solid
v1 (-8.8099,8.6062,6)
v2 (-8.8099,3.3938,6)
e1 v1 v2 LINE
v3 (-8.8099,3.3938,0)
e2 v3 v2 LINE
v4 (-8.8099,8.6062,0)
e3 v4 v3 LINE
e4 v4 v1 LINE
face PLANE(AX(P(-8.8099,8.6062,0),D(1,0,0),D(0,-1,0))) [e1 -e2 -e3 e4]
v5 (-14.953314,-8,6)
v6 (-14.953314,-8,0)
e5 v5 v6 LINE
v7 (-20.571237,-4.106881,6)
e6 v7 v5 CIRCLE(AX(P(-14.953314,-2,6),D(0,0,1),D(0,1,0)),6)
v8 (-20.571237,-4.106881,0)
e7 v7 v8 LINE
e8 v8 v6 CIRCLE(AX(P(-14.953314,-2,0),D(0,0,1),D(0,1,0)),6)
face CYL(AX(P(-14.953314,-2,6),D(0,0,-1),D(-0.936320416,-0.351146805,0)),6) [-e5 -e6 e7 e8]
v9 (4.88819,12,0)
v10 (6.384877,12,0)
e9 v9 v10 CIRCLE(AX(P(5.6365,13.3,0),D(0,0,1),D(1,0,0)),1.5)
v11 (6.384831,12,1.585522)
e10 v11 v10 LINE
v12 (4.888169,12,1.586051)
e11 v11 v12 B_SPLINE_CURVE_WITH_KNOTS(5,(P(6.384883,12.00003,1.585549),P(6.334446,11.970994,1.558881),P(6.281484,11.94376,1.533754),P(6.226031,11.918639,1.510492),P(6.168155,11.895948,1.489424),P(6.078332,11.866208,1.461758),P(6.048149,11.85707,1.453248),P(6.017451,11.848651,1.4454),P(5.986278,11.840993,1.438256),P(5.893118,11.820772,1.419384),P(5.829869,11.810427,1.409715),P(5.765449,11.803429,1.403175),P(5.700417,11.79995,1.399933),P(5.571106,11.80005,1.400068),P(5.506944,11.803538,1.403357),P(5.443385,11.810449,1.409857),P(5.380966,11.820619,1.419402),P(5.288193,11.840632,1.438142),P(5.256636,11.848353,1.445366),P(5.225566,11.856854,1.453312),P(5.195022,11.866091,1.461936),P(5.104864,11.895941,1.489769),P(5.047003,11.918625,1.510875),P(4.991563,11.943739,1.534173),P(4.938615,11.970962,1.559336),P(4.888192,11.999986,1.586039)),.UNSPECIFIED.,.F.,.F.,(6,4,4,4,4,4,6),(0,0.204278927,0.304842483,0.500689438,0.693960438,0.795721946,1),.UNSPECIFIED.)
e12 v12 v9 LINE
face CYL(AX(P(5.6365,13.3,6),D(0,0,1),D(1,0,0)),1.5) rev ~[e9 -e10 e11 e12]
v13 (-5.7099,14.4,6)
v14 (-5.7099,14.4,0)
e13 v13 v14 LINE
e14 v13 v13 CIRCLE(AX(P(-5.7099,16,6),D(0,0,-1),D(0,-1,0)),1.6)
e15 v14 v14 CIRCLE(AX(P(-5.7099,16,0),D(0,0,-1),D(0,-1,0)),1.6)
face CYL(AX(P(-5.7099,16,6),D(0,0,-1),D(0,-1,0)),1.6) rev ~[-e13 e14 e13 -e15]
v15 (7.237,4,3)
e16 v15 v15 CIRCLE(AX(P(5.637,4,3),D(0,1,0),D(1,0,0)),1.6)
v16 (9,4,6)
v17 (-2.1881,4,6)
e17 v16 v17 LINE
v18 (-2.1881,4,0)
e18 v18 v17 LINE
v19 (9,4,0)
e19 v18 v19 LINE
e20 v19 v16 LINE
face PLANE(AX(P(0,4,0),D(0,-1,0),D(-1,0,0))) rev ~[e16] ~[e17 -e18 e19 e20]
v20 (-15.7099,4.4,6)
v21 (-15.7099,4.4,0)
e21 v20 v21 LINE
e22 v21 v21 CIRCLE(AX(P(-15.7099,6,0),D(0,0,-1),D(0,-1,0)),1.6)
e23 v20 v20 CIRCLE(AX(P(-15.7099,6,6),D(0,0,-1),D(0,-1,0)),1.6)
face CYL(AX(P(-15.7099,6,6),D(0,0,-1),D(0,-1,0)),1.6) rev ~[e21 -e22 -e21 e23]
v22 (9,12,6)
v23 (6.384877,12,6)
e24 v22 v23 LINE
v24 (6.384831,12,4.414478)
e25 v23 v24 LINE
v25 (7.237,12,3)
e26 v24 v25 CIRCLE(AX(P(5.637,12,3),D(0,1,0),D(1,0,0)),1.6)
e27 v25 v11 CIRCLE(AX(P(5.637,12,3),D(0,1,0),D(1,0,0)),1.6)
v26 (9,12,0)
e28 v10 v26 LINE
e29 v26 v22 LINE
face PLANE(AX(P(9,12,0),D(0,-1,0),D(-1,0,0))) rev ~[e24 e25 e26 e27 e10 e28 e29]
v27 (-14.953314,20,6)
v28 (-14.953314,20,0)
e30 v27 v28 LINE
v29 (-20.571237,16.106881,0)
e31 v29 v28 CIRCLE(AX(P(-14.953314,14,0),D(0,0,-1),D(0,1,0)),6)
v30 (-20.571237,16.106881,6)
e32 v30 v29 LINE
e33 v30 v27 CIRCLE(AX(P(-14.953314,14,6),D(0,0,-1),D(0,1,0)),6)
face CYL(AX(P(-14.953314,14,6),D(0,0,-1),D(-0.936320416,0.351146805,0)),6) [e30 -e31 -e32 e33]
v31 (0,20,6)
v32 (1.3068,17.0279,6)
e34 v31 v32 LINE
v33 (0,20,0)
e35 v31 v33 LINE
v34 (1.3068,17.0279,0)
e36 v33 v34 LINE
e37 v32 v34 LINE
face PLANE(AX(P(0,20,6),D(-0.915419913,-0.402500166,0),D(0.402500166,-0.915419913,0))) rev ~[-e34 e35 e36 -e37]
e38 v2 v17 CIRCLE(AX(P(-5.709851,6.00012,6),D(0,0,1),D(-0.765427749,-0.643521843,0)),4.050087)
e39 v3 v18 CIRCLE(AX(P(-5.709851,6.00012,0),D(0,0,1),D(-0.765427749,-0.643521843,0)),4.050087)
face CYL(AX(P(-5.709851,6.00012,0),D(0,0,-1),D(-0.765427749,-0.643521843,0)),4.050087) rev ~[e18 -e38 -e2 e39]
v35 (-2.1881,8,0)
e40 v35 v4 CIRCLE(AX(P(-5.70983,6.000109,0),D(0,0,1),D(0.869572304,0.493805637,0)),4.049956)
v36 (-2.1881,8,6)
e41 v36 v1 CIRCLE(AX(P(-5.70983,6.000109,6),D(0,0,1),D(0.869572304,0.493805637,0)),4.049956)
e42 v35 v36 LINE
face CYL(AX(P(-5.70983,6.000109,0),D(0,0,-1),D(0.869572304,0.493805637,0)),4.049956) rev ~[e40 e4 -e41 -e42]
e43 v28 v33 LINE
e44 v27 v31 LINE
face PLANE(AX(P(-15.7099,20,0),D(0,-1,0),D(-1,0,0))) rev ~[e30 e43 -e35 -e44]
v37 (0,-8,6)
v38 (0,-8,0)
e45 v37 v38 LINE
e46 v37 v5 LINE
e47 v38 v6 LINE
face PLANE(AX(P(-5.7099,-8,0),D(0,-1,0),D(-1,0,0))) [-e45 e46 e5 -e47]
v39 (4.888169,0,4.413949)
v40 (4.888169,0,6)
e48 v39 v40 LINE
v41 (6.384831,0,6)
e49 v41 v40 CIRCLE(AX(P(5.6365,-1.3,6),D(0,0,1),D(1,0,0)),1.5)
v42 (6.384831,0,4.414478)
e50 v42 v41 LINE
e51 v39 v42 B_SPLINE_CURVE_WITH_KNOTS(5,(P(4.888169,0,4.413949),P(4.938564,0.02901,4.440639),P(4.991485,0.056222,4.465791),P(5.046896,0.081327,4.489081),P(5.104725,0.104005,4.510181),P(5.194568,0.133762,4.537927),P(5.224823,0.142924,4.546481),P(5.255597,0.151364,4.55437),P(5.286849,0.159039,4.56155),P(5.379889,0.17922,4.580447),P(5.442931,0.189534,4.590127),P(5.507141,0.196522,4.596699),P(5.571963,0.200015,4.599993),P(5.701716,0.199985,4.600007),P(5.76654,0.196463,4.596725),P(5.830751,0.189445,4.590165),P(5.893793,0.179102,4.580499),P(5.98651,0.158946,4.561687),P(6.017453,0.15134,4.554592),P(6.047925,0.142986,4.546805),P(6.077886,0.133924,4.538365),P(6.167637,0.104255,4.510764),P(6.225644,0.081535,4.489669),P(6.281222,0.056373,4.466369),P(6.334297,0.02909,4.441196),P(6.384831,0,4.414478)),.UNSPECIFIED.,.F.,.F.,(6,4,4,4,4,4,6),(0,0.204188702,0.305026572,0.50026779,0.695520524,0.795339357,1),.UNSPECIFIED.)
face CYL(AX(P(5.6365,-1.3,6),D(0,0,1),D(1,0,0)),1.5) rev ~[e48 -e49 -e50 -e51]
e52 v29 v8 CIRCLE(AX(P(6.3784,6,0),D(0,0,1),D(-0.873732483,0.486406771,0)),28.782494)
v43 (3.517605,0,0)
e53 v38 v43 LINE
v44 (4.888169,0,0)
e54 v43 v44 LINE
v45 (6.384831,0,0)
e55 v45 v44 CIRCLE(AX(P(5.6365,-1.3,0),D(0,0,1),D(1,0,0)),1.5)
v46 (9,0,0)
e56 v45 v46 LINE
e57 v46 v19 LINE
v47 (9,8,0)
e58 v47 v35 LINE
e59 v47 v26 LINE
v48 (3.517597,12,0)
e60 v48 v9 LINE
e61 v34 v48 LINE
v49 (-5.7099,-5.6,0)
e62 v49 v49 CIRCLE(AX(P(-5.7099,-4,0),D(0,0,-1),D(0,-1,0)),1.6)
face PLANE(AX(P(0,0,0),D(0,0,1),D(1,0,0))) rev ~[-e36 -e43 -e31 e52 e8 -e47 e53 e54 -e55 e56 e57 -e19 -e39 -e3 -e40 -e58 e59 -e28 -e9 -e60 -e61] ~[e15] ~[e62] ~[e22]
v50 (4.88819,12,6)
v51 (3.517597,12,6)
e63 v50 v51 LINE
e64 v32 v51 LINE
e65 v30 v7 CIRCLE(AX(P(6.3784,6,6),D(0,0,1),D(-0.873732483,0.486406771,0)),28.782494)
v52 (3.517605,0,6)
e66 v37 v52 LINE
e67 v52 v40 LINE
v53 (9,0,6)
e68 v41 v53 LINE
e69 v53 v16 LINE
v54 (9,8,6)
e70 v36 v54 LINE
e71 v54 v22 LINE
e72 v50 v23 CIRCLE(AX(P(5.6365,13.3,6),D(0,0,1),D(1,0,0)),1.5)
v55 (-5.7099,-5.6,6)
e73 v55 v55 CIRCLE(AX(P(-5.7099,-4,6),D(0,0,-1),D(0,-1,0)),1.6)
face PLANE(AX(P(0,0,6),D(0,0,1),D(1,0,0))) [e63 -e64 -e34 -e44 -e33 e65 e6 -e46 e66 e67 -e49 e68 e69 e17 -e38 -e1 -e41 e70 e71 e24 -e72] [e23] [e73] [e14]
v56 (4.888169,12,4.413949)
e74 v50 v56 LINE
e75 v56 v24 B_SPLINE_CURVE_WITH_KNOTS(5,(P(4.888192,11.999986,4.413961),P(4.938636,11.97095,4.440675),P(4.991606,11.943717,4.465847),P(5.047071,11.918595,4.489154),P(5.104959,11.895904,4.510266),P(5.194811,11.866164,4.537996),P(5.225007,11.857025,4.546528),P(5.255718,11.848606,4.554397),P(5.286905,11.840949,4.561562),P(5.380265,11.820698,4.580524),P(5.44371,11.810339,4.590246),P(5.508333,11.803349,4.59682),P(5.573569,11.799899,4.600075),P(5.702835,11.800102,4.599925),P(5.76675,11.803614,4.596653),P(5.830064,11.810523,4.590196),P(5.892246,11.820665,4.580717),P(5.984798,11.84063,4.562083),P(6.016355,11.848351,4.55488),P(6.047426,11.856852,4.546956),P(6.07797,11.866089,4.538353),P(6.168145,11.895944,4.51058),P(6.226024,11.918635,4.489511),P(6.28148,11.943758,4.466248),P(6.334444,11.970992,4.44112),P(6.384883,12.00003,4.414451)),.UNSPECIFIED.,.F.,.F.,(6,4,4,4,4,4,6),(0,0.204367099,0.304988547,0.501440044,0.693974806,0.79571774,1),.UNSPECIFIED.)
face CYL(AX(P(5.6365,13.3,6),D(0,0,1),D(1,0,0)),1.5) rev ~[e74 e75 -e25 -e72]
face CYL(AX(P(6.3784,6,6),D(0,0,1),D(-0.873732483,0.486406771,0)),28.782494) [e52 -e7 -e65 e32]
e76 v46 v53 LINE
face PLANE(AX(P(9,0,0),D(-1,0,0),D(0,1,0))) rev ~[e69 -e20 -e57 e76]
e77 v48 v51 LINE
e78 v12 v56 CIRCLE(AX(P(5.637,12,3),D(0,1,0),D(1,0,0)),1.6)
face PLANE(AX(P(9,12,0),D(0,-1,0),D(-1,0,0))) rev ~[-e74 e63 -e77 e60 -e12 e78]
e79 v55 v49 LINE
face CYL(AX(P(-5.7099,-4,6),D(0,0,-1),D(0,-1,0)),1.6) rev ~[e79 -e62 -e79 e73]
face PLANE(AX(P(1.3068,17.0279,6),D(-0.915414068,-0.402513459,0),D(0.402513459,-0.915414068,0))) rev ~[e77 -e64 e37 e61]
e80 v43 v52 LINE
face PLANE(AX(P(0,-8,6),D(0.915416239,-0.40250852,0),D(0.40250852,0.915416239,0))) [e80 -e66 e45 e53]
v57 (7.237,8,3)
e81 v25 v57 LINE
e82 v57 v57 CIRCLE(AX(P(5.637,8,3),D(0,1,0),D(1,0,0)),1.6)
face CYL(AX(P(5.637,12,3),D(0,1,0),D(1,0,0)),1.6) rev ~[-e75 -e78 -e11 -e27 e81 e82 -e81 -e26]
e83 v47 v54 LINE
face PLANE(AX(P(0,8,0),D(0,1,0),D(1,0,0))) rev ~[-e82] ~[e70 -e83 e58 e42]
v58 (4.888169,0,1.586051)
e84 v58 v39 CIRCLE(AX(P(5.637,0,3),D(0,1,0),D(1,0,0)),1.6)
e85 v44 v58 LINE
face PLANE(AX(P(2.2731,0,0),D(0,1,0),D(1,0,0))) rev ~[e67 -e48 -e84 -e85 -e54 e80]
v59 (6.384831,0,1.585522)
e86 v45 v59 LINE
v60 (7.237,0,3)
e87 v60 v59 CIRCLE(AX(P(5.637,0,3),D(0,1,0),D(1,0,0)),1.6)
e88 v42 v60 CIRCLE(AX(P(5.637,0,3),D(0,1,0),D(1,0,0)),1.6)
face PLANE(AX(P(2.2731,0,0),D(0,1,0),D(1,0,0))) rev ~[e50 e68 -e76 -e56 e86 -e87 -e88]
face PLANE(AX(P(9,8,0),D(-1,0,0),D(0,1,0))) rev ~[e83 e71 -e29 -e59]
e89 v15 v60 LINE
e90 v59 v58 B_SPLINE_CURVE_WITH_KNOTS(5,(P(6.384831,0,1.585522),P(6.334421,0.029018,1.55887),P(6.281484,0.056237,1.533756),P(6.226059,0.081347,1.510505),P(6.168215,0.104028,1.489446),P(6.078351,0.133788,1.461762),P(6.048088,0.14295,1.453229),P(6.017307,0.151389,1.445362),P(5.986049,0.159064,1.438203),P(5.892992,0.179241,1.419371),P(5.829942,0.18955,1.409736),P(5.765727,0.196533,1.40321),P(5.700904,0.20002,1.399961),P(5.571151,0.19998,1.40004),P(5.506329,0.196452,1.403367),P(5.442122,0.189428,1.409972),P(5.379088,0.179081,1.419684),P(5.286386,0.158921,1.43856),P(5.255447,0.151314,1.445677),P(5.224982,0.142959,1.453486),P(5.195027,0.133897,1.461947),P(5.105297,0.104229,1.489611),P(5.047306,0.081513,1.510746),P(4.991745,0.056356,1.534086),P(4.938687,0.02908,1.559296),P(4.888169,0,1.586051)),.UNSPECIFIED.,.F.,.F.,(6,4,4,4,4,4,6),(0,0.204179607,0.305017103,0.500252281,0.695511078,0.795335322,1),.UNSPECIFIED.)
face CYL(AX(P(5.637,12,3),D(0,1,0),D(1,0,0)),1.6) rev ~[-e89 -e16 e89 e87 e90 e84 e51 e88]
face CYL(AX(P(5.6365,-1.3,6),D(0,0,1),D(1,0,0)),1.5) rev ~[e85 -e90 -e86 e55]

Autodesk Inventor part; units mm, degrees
ref_plane "YZ Plane" through (0, 0, 0) normal (1, 0, 0) x (0, 1, 0)
ref_plane "XZ Plane" through (0, 0, 0) normal (0, 1, 0) x (-1, 0, 0)
ref_plane "XY Plane" through (0, 0, 0) normal (0, 0, 1) x (1, 0, 0)
sketch "スケッチ1" plane through (0, 0, 0) normal (0, 0, 1) x (1, 0, 0)
  line L0 (9, 0) -> (9, 4)
  line L1 (9, 12) -> (2.2731, 12)
  line L2 (0, 8) -> (9, 8)
  line L3 (0, 4) -> (9, 4)
  line L4 (9, 8) -> (9, 12)
  line L5 (2.2731, 12) -> (0, 14.2779)
  line L6 (2.2731, 0) -> (-5.7099, -8)
  line L7 (-5.7099, 20) -> (-15.7099, 20)
  line L8 (-5.7099, -8) -> (-15.7099, -8)
  line L9 (-15.7099, 20) -> (-25.7698, 20)
  line L10 (-25.7698, 20) -> (-25.7698, -8)
  line L11 (-25.7698, -8) -> (-15.7099, -8)
  line L12 (2.2731, 0) -> (9, 0)
  line L13 (0, 14.2779) -> (-5.7099, 20)
  arc A0 (-2.1881, 8) -> (-8.8099, 8.6062) centre (-5.7099, 6) ccw
  line L14 (0, 8) -> (-2.1881, 8)
  line L15 (0, 4) -> (-2.1881, 4)
  line L16 (-8.8099, 8.6062) -> (-8.8099, 3.3938)
  arc A1 (-8.8099, 3.3938) -> (-2.1881, 4) centre (-5.7099, 6) ccw
  point P0 (0, 0)
  point P1 (4.5, 12)
  point P2 (4.5, 0)
  point P3 (4.5, 4)
  point P4 (-25.7099, 6)
  point P5 (-8.8099, 6)
  dimension "d5" = 4
  dimension "d8" = 10
  dimension "d9" = 10
  dimension "d12" = 14
  dimension "d90" = 8.1
  dimension "d91" = 3.1
extrude "押し出し1" add sketch "スケッチ1" along normal blind 6
sketch "スケッチ2" plane through (0, 0, 6) normal (0, 0, 1) x (1, 0, 0)
  circle A0 centre (5.6365, 13.3) radius 1.5
  line L0 (9, 8) -> (9, 12) projected
  line L1 (11.5477, 6) -> (-28.1936, 6) construction
  line L2 (9, 12) -> (2.2731, 12) projected
  circle A1 centre (5.6365, -1.3) radius 1.5
  point P0 (0, 0)
  point P1 (4.8882, 12)
  point P2 (6.3849, 12)
  dimension "d15" = 3
  dimension "d16" = 3.3635
  dimension "d17" = 1.3
extrude "押し出し2" cut sketch "スケッチ2" against normal blind 6 contours A0 L2 | A1 picked at (5.4614, 13.0013)
sketch "スケッチ3" plane through (0, 0, 6) normal (0, 0, 1) x (1, 0, 0)
  circle A0 centre (5.6365, 13.3) radius 1.5
  line L0 (9, 12) -> (2.2731, 12) projected
  point P0 (0, 0)
  point P1 (4.8882, 12)
  point P2 (6.3849, 12)
  dimension "d20" = 3
  dimension "d21" = 1.3
extrude "押し出し3" add sketch "スケッチ3" against normal blind 6 contours A0 L0 picked at (5.4614, 13.0013)
sketch "スケッチ4" plane through (0, 0, 6) normal (0, 0, 1) x (1, 0, 0)
  arc A0 (6.3849, 12) -> (4.8882, 12) centre (5.6365, 13.3) ccw projected
  circle A1 centre (5.6365, 13.3) radius 1.5
  point P0 (0, 0)
  dimension "d24" = 3
extrude "押し出し4" cut sketch "スケッチ4" against normal blind 6
fillet "フィレット1" radius 5 1 edges at (-25.7698, 20, 3)
fillet "フィレット2" radius 5 1 edges at (-25.7698, -8, 3)
fillet "フィレット3" radius 3 4 edges at (-5.7099, -8, 3) (2.2731, 0, 3) (-5.7099, 20, 3) (2.2731, 12, 3)
sketch "スケッチ6" plane through (0, 4, 0) normal (0, 1, 0) x (1, 0, 0)
  point P0 (0, 0)
sketch "スケッチ7" plane through (4.8882, 12, 6) normal (0, 1, 0) x (1, 0, 0)
  circle A0 centre (0.7488, 3) radius 1.6
  line L0 (1.4967, 0) -> (0, 0) projected
  line L1 (4.1118, 6) -> (4.1118, 0) projected
  point P0 (-4.8882, 6)
  point P1 (0.7483, 0)
  dimension "d43" = 3.2
  dimension "d44" = 3
  dimension "d45" = 3.363
extrude "押し出し5" cut sketch "スケッチ7" against normal blind 28
sketch "スケッチ11" plane through (0, 0, 6) normal (0, 0, 1) x (1, 0, 0)
  line L0 (-6.9544, 20) -> (-20.7698, 20) projected
  line L1 (-20.7698, 20) -> (-6.9544, 20)
  arc A0 (1.394, 12.8809) -> (3.5176, 12) centre (3.5176, 15) ccw projected
  line L2 (0, 20) -> (1.3068, 17.0279)
  arc A1 (1.394, 12.8809) -> (3.5176, 12) centre (3.5176, 15) ccw
  arc A2 (-4.8308, 19.1191) -> (-6.9544, 20) centre (-6.9544, 17) ccw projected
  arc A3 (-4.8308, 19.1191) -> (-6.9544, 20) centre (-6.9544, 17) ccw
  line L3 (1.394, 12.8809) -> (-4.8308, 19.1191) projected
  line L4 (-4.8308, 19.1191) -> (1.394, 12.8809)
  arc A4 (0, 8) -> (0, 4) centre (-5.7099, 6) ccw projected
  line L5 (-11.7599, 6) -> (12.1155, 6) construction
  line L6 (-20.7698, -8) -> (0, -8)
  line L7 (0, -8) -> (3.5176, 0)
  arc A5 (-6.9544, -8) -> (-4.8308, -7.1191) centre (-6.9544, -5) ccw
  line L8 (1.394, -0.8809) -> (-4.8308, -7.1191)
  line L9 (-6.9544, 20) -> (0, 20)
  line L10 (1.3068, 17.0279) -> (3.5176, 12)
  arc A6 (3.5176, 0) -> (1.394, -0.8809) centre (3.5176, -3) ccw
  point P0 (0, 0)
extrude "押し出し6" add sketch "スケッチ11" against normal blind 6
sketch "スケッチ12" plane through (0, 0, 6) normal (0, 0, 1) x (1, 0, 0)
  arc A0 (0, 8) -> (0, 4) centre (-5.7099, 6) ccw projected
  point P0 (0, 0)
  point P1 (-15.7099, 6)
  point P2 (-5.7099, 16)
  point P3 (-5.7099, -4)
  dimension "d74" = 10
  dimension "d76" = 10
  dimension "d77" = 10
hole "穴4" at (-15.7099, 6, 6) at (-5.7099, 16, 6) at (-5.7099, -4, 6) direction (0, 0, -1) diameter 3.2 end through all
sketch "スケッチ13" plane through (0, 0, 6) normal (0, 0, 1) x (1, 0, 0)
  line L0 (-20.7698, -8) -> (0, -8) projected
  line L1 (0, 20) -> (-20.7698, 20) projected
  line L2 (-18.7698, 20) -> (-18.7698, -8) construction
  line L3 (-25.7698, 15) -> (-25.7698, -3) projected
  arc A0 (-18.7698, 20) -> (-18.7698, -8) centre (6.3784, 6) ccw
  line L4 (-18.7698, 20) -> (-29.3351, 20)
  line L5 (-29.3351, 20) -> (-29.3351, -8)
  line L6 (-29.3351, -8) -> (-18.7698, -8)
  point P0 (0, 0)
  dimension "d85" = 7
extrude "押し出し7" cut sketch "スケッチ13" against normal blind 6
fillet "フィレット4" radius 6 1 edges at (-18.7698, 20, 3)
fillet "フィレット5" radius 6 1 edges at (-18.7698, -8, 3)
properties part number "射出_腕固定3_真" material "ポリカーボネート、クリア"
